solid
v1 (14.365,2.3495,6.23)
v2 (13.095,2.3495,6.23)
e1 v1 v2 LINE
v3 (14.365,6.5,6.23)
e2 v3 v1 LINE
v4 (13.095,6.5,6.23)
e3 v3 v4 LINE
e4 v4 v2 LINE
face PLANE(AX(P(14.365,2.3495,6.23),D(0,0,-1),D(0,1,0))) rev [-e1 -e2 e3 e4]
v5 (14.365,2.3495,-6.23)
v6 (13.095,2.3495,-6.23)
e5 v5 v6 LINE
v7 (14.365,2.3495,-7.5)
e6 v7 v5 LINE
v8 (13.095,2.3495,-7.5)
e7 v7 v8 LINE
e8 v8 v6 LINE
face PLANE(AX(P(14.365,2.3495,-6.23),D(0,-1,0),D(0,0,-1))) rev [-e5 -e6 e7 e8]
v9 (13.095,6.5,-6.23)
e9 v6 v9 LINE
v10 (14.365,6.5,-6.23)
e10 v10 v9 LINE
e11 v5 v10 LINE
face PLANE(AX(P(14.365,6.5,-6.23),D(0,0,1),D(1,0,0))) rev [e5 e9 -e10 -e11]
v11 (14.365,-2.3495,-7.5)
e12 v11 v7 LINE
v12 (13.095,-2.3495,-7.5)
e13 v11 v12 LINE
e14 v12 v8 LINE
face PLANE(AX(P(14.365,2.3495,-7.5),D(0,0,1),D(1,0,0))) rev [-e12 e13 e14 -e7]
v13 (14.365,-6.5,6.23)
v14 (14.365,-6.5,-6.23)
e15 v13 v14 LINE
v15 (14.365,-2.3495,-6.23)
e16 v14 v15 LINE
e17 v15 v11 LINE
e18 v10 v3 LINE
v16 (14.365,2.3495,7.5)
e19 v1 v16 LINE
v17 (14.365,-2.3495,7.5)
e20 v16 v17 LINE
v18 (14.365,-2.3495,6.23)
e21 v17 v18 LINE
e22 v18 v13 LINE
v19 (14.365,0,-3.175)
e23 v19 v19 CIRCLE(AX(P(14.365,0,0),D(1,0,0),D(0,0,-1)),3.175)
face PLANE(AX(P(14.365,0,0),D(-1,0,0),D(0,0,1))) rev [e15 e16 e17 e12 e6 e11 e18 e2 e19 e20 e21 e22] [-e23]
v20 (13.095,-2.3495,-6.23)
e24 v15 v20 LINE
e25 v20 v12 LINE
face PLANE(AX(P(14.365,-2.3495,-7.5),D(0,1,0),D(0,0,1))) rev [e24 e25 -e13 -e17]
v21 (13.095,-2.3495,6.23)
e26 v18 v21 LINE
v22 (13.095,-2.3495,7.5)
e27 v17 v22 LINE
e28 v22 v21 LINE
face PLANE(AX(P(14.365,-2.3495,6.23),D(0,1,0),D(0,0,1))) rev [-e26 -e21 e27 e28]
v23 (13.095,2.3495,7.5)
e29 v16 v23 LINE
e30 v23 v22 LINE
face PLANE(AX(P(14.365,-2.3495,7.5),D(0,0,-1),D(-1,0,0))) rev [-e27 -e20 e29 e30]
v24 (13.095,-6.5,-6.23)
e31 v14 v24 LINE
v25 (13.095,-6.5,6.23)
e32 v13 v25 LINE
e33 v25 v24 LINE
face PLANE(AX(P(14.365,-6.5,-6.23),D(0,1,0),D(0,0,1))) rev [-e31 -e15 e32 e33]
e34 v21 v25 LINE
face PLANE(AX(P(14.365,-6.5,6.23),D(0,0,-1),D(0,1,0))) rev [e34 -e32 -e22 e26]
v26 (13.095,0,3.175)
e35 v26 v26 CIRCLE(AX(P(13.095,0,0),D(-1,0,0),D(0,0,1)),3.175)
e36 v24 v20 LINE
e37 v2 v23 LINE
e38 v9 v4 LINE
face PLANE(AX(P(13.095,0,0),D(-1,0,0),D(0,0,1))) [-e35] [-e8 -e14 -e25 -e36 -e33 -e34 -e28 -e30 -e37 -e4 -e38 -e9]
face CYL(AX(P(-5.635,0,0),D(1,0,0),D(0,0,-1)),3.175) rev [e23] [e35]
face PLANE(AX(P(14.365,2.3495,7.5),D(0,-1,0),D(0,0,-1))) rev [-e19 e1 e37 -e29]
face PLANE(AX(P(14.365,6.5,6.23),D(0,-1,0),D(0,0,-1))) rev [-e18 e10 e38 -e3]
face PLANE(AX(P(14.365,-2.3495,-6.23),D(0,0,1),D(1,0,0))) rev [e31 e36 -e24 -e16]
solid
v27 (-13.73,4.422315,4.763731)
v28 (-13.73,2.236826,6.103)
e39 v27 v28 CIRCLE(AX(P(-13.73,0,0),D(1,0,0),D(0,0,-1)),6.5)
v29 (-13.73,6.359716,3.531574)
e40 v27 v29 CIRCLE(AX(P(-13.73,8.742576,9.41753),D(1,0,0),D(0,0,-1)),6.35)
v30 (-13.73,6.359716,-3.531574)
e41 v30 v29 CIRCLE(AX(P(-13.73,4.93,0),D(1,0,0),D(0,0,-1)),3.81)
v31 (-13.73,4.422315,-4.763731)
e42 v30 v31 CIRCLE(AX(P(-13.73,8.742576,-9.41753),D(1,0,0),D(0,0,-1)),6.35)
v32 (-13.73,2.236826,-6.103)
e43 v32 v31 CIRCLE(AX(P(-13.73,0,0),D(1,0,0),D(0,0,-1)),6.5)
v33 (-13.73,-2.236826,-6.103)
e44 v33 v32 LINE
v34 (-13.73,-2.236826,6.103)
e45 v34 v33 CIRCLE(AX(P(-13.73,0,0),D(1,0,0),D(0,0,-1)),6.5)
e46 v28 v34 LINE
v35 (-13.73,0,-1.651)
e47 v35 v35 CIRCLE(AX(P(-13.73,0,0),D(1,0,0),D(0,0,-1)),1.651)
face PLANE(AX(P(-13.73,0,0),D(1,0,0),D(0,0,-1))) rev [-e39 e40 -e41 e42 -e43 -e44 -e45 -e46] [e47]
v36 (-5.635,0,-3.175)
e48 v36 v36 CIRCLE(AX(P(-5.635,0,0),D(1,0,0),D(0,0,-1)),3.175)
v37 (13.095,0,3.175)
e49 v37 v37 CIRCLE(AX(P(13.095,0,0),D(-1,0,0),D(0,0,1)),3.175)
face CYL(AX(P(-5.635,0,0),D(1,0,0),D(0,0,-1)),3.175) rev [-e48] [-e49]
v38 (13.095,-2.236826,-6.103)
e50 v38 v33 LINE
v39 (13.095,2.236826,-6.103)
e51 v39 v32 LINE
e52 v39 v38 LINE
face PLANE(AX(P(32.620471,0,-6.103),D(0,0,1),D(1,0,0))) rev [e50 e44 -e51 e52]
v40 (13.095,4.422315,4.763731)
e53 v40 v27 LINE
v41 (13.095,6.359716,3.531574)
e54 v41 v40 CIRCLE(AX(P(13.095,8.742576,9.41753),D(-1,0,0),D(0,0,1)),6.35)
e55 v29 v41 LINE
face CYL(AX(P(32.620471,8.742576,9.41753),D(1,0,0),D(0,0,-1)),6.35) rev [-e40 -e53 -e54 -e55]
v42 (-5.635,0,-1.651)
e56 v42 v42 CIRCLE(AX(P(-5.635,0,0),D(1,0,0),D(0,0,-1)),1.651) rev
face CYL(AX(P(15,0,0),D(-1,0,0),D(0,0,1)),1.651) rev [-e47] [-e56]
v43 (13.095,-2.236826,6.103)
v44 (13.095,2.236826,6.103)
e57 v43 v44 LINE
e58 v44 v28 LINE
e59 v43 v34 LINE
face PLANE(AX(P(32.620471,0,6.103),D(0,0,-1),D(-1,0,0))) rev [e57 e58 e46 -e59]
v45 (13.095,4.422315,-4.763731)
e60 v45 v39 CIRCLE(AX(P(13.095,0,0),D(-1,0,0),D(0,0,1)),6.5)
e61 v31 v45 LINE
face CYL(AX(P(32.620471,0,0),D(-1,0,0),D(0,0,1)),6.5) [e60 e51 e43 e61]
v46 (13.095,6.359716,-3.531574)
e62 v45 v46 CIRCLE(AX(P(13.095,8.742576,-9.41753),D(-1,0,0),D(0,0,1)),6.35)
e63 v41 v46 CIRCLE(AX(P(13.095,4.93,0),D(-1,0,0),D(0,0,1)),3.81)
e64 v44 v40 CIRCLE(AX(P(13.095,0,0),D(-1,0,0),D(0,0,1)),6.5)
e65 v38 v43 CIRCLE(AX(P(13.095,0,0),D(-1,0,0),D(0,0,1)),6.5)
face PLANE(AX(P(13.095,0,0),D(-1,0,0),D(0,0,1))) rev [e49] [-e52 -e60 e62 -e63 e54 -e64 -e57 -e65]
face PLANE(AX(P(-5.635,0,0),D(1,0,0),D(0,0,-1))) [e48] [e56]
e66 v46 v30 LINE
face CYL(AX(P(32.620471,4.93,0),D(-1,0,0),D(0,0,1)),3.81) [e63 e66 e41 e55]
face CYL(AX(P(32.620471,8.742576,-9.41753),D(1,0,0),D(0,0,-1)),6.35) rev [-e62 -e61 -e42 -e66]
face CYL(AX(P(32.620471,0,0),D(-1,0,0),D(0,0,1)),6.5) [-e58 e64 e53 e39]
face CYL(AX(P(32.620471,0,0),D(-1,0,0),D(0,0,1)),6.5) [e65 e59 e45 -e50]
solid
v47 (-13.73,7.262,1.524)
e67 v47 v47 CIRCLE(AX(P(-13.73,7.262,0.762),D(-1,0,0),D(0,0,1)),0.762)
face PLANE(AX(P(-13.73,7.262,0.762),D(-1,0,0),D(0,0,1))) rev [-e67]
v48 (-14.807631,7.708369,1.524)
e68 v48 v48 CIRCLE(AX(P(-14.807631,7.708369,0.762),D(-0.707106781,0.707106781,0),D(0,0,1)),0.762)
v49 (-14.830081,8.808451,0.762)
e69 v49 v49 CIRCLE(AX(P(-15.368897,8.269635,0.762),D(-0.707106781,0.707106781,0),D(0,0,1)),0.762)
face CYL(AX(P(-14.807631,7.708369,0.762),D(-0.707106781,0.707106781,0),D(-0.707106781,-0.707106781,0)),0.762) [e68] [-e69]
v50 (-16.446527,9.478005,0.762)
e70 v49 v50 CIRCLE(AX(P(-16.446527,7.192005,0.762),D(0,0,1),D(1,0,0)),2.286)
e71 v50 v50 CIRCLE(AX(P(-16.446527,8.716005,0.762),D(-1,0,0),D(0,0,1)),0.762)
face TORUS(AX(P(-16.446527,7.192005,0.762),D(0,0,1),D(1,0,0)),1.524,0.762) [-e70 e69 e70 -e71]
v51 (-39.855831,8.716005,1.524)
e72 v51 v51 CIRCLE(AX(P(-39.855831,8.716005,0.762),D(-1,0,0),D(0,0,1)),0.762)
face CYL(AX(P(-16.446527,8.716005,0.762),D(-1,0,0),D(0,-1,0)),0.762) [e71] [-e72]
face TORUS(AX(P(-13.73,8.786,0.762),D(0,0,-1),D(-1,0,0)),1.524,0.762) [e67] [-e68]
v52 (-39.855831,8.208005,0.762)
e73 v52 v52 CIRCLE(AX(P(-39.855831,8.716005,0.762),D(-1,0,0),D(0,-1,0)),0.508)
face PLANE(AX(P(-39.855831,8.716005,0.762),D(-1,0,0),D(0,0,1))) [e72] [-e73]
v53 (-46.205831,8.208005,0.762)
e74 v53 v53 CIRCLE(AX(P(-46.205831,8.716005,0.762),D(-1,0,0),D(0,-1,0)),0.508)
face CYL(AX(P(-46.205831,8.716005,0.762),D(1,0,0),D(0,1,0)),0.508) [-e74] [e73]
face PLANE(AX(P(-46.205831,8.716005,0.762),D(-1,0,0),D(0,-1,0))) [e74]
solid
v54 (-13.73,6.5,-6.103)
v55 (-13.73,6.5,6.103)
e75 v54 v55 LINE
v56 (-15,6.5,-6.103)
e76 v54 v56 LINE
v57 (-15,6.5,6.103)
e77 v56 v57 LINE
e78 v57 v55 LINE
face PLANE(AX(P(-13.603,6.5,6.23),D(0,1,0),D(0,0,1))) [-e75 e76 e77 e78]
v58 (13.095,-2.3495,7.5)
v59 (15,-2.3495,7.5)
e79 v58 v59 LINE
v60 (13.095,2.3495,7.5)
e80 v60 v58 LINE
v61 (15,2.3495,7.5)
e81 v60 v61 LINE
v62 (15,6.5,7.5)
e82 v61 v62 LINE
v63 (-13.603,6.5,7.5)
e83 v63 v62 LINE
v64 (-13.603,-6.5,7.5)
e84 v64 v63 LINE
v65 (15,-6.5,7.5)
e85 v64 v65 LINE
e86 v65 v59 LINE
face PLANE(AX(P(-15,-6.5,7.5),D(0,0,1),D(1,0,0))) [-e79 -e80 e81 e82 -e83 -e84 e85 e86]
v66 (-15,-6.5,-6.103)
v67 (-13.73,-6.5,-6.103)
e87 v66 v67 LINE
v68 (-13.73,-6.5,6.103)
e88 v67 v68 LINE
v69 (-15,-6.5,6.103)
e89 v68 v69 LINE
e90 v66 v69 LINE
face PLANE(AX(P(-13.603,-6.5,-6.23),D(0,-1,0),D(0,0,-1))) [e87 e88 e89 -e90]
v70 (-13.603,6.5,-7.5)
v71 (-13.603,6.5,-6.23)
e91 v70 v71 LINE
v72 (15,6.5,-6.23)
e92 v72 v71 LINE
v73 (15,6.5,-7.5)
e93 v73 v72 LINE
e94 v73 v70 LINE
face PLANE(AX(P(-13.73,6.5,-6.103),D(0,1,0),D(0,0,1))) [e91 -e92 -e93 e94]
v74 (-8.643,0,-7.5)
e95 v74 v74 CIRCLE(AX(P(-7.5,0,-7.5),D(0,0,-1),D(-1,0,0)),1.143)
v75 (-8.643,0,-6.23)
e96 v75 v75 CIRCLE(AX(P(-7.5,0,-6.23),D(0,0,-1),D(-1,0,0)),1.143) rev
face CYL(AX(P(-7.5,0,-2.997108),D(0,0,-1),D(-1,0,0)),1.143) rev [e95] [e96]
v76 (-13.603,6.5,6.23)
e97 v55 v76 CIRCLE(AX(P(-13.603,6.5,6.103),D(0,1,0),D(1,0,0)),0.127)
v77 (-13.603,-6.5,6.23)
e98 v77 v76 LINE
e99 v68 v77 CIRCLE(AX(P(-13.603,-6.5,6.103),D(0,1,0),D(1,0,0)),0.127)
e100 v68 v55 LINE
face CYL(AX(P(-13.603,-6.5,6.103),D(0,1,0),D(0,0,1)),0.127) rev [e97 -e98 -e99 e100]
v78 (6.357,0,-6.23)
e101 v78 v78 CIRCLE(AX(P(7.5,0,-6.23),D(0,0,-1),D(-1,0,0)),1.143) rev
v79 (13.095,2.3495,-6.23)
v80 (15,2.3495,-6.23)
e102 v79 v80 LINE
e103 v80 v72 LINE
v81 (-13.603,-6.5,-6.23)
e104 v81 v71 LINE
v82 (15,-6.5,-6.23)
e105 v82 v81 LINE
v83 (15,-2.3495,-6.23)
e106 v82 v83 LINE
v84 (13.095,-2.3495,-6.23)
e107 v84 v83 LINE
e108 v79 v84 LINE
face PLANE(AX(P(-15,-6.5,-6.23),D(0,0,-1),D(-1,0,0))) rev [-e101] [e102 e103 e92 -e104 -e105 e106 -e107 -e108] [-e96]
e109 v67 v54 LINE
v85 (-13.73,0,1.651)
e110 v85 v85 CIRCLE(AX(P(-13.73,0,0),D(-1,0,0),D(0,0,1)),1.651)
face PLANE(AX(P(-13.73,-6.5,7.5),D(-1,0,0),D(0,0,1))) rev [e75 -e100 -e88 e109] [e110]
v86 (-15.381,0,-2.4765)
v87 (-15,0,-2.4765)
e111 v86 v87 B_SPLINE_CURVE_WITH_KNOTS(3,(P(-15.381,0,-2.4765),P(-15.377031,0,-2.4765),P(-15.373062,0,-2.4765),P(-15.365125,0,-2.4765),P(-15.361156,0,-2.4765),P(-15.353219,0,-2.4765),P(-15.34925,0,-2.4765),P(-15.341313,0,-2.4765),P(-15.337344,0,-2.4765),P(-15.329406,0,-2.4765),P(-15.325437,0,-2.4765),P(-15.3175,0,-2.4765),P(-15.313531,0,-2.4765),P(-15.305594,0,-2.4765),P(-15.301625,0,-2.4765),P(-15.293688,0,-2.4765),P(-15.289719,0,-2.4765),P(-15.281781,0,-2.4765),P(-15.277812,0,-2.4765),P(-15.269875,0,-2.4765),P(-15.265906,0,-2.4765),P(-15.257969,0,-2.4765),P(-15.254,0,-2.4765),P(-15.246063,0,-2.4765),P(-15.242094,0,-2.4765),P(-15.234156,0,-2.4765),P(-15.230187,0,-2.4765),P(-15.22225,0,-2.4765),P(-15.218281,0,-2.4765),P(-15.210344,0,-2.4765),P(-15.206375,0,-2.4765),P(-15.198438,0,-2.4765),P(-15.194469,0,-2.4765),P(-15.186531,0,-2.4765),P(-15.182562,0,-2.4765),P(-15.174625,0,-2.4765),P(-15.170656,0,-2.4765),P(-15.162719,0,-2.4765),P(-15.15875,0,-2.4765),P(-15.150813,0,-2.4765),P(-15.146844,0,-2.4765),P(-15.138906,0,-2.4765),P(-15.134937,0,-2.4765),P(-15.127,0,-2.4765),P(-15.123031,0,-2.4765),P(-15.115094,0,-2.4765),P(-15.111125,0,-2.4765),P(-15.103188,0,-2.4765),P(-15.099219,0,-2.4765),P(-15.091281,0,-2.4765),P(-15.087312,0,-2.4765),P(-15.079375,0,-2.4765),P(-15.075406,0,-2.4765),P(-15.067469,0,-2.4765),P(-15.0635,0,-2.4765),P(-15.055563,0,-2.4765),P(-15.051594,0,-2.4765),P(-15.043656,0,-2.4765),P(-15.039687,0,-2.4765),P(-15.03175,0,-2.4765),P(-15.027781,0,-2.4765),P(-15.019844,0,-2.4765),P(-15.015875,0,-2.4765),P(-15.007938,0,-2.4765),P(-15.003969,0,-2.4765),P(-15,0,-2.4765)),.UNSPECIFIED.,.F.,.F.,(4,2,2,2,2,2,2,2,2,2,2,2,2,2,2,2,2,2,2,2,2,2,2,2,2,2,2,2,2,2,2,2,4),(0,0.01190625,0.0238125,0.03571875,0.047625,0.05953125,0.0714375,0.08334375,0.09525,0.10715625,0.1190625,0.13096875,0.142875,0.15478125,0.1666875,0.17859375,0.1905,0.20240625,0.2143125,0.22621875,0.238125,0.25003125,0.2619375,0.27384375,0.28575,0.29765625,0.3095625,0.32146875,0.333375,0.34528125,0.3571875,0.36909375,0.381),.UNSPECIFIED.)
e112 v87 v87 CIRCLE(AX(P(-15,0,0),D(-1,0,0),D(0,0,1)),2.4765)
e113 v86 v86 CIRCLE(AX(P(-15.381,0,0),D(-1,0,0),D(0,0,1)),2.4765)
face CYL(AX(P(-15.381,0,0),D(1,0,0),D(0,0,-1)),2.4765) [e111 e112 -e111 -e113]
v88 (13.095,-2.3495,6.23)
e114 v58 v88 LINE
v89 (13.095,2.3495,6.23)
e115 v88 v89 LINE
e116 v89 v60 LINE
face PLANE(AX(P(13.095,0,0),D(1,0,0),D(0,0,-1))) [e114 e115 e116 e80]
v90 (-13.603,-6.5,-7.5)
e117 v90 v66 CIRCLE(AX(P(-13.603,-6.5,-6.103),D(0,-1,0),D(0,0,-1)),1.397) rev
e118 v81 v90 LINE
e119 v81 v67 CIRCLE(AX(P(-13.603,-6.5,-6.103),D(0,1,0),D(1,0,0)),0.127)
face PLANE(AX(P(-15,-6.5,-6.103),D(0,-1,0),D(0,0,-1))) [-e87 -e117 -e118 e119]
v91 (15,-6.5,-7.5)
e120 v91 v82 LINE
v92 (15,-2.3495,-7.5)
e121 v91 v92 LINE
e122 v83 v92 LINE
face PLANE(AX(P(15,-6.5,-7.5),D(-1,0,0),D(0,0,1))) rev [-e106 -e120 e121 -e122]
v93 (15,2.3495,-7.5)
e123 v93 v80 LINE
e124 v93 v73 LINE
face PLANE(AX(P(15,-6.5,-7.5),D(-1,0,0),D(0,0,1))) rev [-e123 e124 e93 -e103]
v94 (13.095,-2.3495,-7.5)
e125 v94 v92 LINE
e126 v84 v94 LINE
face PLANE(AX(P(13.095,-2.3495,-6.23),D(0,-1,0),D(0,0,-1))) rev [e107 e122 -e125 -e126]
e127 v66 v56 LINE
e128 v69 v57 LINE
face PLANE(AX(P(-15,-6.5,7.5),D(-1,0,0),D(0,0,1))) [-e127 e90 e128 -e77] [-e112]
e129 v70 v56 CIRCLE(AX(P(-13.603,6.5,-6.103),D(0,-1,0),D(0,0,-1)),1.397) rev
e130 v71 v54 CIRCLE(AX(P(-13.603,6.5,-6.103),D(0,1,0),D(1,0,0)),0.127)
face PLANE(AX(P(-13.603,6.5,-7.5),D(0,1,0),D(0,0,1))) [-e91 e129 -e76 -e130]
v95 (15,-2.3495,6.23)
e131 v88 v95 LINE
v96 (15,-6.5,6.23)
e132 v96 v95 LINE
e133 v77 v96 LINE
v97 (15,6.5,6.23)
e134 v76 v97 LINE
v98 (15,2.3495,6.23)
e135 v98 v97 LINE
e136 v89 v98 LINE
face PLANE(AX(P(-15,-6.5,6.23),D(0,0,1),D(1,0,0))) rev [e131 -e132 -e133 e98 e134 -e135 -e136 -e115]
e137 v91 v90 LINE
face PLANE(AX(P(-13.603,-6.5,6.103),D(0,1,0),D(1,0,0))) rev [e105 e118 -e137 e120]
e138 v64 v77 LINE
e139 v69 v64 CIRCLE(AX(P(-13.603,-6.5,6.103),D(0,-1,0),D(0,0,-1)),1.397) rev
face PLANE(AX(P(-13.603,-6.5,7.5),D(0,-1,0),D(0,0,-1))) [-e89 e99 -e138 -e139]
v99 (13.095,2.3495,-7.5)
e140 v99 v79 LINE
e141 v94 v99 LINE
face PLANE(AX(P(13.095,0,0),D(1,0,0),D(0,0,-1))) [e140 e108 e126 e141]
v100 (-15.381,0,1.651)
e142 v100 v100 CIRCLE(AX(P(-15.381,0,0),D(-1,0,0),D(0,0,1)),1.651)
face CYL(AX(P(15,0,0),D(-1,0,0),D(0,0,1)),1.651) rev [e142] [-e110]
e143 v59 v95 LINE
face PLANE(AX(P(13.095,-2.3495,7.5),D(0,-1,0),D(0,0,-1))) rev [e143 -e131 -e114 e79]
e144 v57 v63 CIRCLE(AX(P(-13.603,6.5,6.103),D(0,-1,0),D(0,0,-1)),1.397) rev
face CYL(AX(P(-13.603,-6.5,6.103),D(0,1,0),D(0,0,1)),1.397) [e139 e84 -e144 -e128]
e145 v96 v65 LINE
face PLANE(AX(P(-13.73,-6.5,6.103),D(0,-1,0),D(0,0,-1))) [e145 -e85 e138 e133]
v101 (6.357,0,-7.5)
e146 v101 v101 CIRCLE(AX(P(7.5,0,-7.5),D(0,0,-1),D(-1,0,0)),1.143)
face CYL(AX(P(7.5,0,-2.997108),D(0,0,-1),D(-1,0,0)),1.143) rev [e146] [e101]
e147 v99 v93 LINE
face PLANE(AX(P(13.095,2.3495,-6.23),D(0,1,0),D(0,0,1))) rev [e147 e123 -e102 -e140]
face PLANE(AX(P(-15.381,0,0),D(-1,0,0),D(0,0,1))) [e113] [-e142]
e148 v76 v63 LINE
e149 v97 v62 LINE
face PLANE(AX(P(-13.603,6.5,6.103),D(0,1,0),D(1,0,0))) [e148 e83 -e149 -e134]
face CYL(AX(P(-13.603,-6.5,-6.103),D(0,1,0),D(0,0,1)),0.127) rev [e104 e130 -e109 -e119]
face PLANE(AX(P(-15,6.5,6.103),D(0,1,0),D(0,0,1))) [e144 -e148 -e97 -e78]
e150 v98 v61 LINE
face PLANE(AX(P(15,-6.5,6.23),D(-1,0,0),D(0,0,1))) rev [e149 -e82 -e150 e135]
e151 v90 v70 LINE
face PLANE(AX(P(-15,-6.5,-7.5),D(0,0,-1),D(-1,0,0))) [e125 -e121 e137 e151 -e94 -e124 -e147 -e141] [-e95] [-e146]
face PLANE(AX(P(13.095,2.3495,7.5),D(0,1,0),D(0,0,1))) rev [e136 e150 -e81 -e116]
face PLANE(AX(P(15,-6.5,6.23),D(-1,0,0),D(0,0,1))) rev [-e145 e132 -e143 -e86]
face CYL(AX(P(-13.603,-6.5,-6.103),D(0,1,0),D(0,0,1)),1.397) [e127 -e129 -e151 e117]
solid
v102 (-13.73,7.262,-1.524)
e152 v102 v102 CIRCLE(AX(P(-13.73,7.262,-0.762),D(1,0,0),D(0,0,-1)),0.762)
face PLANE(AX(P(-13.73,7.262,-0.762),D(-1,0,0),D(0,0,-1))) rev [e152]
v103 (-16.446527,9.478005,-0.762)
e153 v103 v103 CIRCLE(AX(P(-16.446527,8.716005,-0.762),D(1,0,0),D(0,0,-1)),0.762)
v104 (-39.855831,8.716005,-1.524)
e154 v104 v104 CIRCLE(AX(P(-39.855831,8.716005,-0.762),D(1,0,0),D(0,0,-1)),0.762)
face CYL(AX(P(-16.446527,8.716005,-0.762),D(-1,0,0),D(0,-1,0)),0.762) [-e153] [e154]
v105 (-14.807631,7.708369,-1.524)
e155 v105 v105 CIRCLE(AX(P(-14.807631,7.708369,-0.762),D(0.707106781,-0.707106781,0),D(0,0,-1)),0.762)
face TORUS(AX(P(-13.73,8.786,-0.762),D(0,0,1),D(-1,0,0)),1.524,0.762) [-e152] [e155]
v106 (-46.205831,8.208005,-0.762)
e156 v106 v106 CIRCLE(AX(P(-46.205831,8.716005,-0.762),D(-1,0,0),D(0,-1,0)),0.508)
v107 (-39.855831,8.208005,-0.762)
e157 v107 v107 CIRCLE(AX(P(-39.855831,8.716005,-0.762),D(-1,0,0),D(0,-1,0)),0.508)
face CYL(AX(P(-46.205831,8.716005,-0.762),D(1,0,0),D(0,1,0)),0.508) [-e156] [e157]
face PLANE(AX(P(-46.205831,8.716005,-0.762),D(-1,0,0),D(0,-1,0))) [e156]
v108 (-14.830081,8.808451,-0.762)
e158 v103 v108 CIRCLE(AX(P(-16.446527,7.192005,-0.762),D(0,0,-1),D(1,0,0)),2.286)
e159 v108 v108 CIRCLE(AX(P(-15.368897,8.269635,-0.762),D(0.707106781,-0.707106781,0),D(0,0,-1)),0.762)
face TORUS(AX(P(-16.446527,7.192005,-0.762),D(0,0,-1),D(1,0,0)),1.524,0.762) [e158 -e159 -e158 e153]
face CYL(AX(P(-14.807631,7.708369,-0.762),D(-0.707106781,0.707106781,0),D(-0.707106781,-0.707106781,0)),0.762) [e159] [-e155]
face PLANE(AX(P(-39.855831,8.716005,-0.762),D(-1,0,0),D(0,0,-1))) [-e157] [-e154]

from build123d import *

# Parameters (mm, degrees)
T_LE_DE_BASE_PLI_E1_DEPTH = 6.5
ESQUISSE6_W               = 1.27
ESQUISSE6_H               = 4.699
ENL_V_MAT_EXTRU_1_DEPTH   = 1.905
BOSS_EXTRU_1_DEPTH        = 1.27
BOSS_EXTRU_2_DEPTH        = 26.825
CONG_1_R                  = 6.35
ESQUISSE9_R               = 0.762
ESQUISSE13_R              = 1.651
ENL_V_MAT_EXTRU_2_DEPTH   = 33.343199779
BOSS_EXTRU_3_START        = 0.381
ESQUISSE14_R              = 2.4765
ESQUISSE14_R_2            = 1.651
BOSS_EXTRU_3_DEPTH        = 0.381
ESQUISSE15_R              = 3.175
ENL_V_MAT_EXTRU_3_DEPTH   = 20
ESQUISSE17_R              = 0.508
BOSS_EXTRU_4_DEPTH        = 6.35
ESQUISSE19_R              = 1.143
ENL_V_MAT_EXTRU_7_DEPTH   = 1.27


# Read off the part's stored shape, not the designer's step: Boss.-Extru.2
# Sheet-metal steps are written as plain solids
with BuildPart() as part:
    # Esquisse1 → Tôle de base pliée1 (new, symmetric)
    with BuildSketch(Plane(origin=(0, 0, 0), x_dir=(1, 0, 0), z_dir=(0, 1, 0))):
        with BuildLine():
            Line((15, 7.5), (-13.603, 7.5))
            ThreePointArc((-13.603, 7.5), (-14.590828173, 7.090828173), (-15, 6.103))
            Line((-15, 6.103), (-15, -6.103))
            ThreePointArc((-15, -6.103), (-14.590828173, -7.090828173), (-13.603, -7.5))
            Line((-13.603, -7.5), (15, -7.5))
            Line((15, -7.5), (15, -6.23))
            Line((15, -6.23), (-13.603, -6.23))
            ThreePointArc((-13.603, -6.23), (-13.692802561, -6.192802561), (-13.73, -6.103))
            Line((-13.73, -6.103), (-13.73, 6.103))
            ThreePointArc((-13.73, 6.103), (-13.692802561, 6.192802561), (-13.603, 6.23))
            Line((-13.603, 6.23), (15, 6.23))
            Line((15, 6.23), (15, 7.5))
        make_face()
    extrude(amount=T_LE_DE_BASE_PLI_E1_DEPTH, both=True)

    # Esquisse6 → Enlèv. mat.-Extru.1 (cut)
    with BuildSketch(Plane(origin=(15, 0, 0), x_dir=(0, 0, -1), z_dir=(1, 0, 0))):
        with Locations((-6.865, 0)):
            Rectangle(ESQUISSE6_W, ESQUISSE6_H)
        with Locations((6.865, 0)):
            Rectangle(ESQUISSE6_W, ESQUISSE6_H)
    extrude(amount=-ENL_V_MAT_EXTRU_1_DEPTH, mode=Mode.SUBTRACT)


with BuildPart() as body_2:
    # Esquisse7 → Boss.-Extru.1 (new body)
    with BuildSketch(Plane(origin=(13.095, 0, 0), x_dir=(0, 0, -1), z_dir=(1, 0, 0))):
        Polygon((-7.5, 2.3495), (-6.23, 2.3495), (-6.23, 6.5), (6.23, 6.5), (6.23, 2.3495), (7.5, 2.3495), (7.5, -2.3495), (6.23, -2.3495), (6.23, -6.5), (-6.23, -6.5), (-6.23, -2.3495), (-7.5, -2.3495), align=None)
    extrude(amount=BOSS_EXTRU_1_DEPTH)


with BuildPart() as body_3:
    # Boss.-Extru.2 outline → Boss.-Extru.2 (new body)
    with BuildSketch(Plane(origin=(-13.73, 0, 0), x_dir=(0, 0, -1), z_dir=(1, 0, 0))):
        with BuildLine():
            ThreePointArc((6.103, 2.2368261), (5.176867338, 3.93065447), (3.794095002, 5.277768763))
            ThreePointArc((3.794095002, 5.277768763), (0, 8.74), (-3.794095002, 5.277768763))
            ThreePointArc((-3.794095002, 5.277768763), (-5.176867338, 3.93065447), (-6.103, 2.2368261))
            Line((-6.103, 2.2368261), (-6.103, -2.2368261))
            ThreePointArc((-6.103, -2.2368261), (0, -6.5), (6.103, -2.2368261))
            Line((6.103, -2.2368261), (6.103, 2.2368261))
        make_face()
    extrude(amount=BOSS_EXTRU_2_DEPTH)

    # Congé1
    cong_1_edges = [body_3.edges().sort_by_distance(p)[0] for p in [
        (-0.3175, 5.277768763, -3.794095002),
        (-0.3175, 5.277768763, 3.794095002),
    ]]
    fillet(cong_1_edges, radius=CONG_1_R)


with BuildPart() as body_4:
    # Balayage2: sweep along a path in Esquisse10
    with BuildLine(Plane.XY) as balayage2_path:
        Line((-39.855830676, 8.716004539), (-16.446527477, 8.716004539))
        ThreePointArc((-16.446527477, 8.716004539), (-15.863317926, 8.599996946), (-15.368896742, 8.269635273))
        Line((-15.368896742, 8.269635273), (-14.807630735, 7.708369265))
        ThreePointArc((-14.807630735, 7.708369265), (-14.313209551, 7.378007592), (-13.73, 7.262))
    # Esquisse9 → Balayage2 (sweep)
    with BuildSketch(Plane.ZY.offset(13.73)):
        with Locations((0.762, 7.262)):
            Circle(ESQUISSE9_R)
    sweep(path=balayage2_path.line)


with BuildPart() as body_5:
    # Symétrie1: mirrored copy
    add(body_4.part.mirror(Plane.XY))


with BuildPart() as enl_v_mat_extru_2_tool:
    # Esquisse13 → Enlèv. mat.-Extru.2 (new, through all)
    with BuildSketch(Plane.ZY.offset(15)):
        Circle(ESQUISSE13_R)
    extrude(amount=-ENL_V_MAT_EXTRU_2_DEPTH)


with BuildPart() as part_1:
    add(part.part)

    # Enlèv. mat.-Extru.2: cut by enl_v_mat_extru_2_tool
    add(enl_v_mat_extru_2_tool.part, mode=Mode.SUBTRACT)

    # Esquisse14 → Boss.-Extru.3 (add)
    with BuildSketch(Plane.ZY.offset(15).offset(BOSS_EXTRU_3_START)):
        with Locations(Location((0, 0, 0), (0, 0, 180))):
            Circle(ESQUISSE14_R)
        Circle(ESQUISSE14_R_2, mode=Mode.SUBTRACT)
    extrude(amount=-BOSS_EXTRU_3_DEPTH)

    # Esquisse19 → Enlèv. mat.-Extru.7 (cut)
    with BuildSketch(Plane(origin=(0, 0, -7.5), x_dir=(-1, 0, 0), z_dir=(0, 0, -1))):
        with Locations((-7.5, 0)):
            Circle(ESQUISSE19_R)
        with Locations((7.5, 0)):
            Circle(ESQUISSE19_R)
    extrude(amount=-ENL_V_MAT_EXTRU_7_DEPTH, mode=Mode.SUBTRACT)


with BuildPart() as body_2_1:
    add(body_2.part)

    # Enlèv. mat.-Extru.2: cut by enl_v_mat_extru_2_tool
    add(enl_v_mat_extru_2_tool.part, mode=Mode.SUBTRACT)


with BuildPart() as body_3_1:
    add(body_3.part)

    # Enlèv. mat.-Extru.2: cut by enl_v_mat_extru_2_tool
    add(enl_v_mat_extru_2_tool.part, mode=Mode.SUBTRACT)


with BuildPart() as enl_v_mat_extru_3_tool:
    # Esquisse15 → Enlèv. mat.-Extru.3 (new body)
    with BuildSketch(Plane(origin=(14.365, 0, 0), x_dir=(0, 0, -1), z_dir=(1, 0, 0))):
        Circle(ESQUISSE15_R)
    extrude(amount=-ENL_V_MAT_EXTRU_3_DEPTH)


with BuildPart() as body_2_2:
    add(body_2_1.part)

    # Enlèv. mat.-Extru.3: cut by enl_v_mat_extru_3_tool
    add(enl_v_mat_extru_3_tool.part, mode=Mode.SUBTRACT)


with BuildPart() as body_3_2:
    add(body_3_1.part)

    # Enlèv. mat.-Extru.3: cut by enl_v_mat_extru_3_tool
    add(enl_v_mat_extru_3_tool.part, mode=Mode.SUBTRACT)


with BuildPart() as body_4_1:
    add(body_4.part)

    add(body_5.part)  # Boss.-Extru.4 merges body 5
    # Esquisse17 → Boss.-Extru.4 (add)
    with BuildSketch(Plane.ZY.offset(39.855830676)):
        with Locations(Location((-0.762, 8.716004539, 0), (0, 0, 270))):
            Circle(ESQUISSE17_R)
        with Locations(Location((0.762, 8.716004539, 0), (0, 0, 270))):
            Circle(ESQUISSE17_R)
    extrude(amount=BOSS_EXTRU_4_DEPTH)


solid = Compound([part_1.part, body_2_2.part, body_3_2.part, body_4_1.part])
